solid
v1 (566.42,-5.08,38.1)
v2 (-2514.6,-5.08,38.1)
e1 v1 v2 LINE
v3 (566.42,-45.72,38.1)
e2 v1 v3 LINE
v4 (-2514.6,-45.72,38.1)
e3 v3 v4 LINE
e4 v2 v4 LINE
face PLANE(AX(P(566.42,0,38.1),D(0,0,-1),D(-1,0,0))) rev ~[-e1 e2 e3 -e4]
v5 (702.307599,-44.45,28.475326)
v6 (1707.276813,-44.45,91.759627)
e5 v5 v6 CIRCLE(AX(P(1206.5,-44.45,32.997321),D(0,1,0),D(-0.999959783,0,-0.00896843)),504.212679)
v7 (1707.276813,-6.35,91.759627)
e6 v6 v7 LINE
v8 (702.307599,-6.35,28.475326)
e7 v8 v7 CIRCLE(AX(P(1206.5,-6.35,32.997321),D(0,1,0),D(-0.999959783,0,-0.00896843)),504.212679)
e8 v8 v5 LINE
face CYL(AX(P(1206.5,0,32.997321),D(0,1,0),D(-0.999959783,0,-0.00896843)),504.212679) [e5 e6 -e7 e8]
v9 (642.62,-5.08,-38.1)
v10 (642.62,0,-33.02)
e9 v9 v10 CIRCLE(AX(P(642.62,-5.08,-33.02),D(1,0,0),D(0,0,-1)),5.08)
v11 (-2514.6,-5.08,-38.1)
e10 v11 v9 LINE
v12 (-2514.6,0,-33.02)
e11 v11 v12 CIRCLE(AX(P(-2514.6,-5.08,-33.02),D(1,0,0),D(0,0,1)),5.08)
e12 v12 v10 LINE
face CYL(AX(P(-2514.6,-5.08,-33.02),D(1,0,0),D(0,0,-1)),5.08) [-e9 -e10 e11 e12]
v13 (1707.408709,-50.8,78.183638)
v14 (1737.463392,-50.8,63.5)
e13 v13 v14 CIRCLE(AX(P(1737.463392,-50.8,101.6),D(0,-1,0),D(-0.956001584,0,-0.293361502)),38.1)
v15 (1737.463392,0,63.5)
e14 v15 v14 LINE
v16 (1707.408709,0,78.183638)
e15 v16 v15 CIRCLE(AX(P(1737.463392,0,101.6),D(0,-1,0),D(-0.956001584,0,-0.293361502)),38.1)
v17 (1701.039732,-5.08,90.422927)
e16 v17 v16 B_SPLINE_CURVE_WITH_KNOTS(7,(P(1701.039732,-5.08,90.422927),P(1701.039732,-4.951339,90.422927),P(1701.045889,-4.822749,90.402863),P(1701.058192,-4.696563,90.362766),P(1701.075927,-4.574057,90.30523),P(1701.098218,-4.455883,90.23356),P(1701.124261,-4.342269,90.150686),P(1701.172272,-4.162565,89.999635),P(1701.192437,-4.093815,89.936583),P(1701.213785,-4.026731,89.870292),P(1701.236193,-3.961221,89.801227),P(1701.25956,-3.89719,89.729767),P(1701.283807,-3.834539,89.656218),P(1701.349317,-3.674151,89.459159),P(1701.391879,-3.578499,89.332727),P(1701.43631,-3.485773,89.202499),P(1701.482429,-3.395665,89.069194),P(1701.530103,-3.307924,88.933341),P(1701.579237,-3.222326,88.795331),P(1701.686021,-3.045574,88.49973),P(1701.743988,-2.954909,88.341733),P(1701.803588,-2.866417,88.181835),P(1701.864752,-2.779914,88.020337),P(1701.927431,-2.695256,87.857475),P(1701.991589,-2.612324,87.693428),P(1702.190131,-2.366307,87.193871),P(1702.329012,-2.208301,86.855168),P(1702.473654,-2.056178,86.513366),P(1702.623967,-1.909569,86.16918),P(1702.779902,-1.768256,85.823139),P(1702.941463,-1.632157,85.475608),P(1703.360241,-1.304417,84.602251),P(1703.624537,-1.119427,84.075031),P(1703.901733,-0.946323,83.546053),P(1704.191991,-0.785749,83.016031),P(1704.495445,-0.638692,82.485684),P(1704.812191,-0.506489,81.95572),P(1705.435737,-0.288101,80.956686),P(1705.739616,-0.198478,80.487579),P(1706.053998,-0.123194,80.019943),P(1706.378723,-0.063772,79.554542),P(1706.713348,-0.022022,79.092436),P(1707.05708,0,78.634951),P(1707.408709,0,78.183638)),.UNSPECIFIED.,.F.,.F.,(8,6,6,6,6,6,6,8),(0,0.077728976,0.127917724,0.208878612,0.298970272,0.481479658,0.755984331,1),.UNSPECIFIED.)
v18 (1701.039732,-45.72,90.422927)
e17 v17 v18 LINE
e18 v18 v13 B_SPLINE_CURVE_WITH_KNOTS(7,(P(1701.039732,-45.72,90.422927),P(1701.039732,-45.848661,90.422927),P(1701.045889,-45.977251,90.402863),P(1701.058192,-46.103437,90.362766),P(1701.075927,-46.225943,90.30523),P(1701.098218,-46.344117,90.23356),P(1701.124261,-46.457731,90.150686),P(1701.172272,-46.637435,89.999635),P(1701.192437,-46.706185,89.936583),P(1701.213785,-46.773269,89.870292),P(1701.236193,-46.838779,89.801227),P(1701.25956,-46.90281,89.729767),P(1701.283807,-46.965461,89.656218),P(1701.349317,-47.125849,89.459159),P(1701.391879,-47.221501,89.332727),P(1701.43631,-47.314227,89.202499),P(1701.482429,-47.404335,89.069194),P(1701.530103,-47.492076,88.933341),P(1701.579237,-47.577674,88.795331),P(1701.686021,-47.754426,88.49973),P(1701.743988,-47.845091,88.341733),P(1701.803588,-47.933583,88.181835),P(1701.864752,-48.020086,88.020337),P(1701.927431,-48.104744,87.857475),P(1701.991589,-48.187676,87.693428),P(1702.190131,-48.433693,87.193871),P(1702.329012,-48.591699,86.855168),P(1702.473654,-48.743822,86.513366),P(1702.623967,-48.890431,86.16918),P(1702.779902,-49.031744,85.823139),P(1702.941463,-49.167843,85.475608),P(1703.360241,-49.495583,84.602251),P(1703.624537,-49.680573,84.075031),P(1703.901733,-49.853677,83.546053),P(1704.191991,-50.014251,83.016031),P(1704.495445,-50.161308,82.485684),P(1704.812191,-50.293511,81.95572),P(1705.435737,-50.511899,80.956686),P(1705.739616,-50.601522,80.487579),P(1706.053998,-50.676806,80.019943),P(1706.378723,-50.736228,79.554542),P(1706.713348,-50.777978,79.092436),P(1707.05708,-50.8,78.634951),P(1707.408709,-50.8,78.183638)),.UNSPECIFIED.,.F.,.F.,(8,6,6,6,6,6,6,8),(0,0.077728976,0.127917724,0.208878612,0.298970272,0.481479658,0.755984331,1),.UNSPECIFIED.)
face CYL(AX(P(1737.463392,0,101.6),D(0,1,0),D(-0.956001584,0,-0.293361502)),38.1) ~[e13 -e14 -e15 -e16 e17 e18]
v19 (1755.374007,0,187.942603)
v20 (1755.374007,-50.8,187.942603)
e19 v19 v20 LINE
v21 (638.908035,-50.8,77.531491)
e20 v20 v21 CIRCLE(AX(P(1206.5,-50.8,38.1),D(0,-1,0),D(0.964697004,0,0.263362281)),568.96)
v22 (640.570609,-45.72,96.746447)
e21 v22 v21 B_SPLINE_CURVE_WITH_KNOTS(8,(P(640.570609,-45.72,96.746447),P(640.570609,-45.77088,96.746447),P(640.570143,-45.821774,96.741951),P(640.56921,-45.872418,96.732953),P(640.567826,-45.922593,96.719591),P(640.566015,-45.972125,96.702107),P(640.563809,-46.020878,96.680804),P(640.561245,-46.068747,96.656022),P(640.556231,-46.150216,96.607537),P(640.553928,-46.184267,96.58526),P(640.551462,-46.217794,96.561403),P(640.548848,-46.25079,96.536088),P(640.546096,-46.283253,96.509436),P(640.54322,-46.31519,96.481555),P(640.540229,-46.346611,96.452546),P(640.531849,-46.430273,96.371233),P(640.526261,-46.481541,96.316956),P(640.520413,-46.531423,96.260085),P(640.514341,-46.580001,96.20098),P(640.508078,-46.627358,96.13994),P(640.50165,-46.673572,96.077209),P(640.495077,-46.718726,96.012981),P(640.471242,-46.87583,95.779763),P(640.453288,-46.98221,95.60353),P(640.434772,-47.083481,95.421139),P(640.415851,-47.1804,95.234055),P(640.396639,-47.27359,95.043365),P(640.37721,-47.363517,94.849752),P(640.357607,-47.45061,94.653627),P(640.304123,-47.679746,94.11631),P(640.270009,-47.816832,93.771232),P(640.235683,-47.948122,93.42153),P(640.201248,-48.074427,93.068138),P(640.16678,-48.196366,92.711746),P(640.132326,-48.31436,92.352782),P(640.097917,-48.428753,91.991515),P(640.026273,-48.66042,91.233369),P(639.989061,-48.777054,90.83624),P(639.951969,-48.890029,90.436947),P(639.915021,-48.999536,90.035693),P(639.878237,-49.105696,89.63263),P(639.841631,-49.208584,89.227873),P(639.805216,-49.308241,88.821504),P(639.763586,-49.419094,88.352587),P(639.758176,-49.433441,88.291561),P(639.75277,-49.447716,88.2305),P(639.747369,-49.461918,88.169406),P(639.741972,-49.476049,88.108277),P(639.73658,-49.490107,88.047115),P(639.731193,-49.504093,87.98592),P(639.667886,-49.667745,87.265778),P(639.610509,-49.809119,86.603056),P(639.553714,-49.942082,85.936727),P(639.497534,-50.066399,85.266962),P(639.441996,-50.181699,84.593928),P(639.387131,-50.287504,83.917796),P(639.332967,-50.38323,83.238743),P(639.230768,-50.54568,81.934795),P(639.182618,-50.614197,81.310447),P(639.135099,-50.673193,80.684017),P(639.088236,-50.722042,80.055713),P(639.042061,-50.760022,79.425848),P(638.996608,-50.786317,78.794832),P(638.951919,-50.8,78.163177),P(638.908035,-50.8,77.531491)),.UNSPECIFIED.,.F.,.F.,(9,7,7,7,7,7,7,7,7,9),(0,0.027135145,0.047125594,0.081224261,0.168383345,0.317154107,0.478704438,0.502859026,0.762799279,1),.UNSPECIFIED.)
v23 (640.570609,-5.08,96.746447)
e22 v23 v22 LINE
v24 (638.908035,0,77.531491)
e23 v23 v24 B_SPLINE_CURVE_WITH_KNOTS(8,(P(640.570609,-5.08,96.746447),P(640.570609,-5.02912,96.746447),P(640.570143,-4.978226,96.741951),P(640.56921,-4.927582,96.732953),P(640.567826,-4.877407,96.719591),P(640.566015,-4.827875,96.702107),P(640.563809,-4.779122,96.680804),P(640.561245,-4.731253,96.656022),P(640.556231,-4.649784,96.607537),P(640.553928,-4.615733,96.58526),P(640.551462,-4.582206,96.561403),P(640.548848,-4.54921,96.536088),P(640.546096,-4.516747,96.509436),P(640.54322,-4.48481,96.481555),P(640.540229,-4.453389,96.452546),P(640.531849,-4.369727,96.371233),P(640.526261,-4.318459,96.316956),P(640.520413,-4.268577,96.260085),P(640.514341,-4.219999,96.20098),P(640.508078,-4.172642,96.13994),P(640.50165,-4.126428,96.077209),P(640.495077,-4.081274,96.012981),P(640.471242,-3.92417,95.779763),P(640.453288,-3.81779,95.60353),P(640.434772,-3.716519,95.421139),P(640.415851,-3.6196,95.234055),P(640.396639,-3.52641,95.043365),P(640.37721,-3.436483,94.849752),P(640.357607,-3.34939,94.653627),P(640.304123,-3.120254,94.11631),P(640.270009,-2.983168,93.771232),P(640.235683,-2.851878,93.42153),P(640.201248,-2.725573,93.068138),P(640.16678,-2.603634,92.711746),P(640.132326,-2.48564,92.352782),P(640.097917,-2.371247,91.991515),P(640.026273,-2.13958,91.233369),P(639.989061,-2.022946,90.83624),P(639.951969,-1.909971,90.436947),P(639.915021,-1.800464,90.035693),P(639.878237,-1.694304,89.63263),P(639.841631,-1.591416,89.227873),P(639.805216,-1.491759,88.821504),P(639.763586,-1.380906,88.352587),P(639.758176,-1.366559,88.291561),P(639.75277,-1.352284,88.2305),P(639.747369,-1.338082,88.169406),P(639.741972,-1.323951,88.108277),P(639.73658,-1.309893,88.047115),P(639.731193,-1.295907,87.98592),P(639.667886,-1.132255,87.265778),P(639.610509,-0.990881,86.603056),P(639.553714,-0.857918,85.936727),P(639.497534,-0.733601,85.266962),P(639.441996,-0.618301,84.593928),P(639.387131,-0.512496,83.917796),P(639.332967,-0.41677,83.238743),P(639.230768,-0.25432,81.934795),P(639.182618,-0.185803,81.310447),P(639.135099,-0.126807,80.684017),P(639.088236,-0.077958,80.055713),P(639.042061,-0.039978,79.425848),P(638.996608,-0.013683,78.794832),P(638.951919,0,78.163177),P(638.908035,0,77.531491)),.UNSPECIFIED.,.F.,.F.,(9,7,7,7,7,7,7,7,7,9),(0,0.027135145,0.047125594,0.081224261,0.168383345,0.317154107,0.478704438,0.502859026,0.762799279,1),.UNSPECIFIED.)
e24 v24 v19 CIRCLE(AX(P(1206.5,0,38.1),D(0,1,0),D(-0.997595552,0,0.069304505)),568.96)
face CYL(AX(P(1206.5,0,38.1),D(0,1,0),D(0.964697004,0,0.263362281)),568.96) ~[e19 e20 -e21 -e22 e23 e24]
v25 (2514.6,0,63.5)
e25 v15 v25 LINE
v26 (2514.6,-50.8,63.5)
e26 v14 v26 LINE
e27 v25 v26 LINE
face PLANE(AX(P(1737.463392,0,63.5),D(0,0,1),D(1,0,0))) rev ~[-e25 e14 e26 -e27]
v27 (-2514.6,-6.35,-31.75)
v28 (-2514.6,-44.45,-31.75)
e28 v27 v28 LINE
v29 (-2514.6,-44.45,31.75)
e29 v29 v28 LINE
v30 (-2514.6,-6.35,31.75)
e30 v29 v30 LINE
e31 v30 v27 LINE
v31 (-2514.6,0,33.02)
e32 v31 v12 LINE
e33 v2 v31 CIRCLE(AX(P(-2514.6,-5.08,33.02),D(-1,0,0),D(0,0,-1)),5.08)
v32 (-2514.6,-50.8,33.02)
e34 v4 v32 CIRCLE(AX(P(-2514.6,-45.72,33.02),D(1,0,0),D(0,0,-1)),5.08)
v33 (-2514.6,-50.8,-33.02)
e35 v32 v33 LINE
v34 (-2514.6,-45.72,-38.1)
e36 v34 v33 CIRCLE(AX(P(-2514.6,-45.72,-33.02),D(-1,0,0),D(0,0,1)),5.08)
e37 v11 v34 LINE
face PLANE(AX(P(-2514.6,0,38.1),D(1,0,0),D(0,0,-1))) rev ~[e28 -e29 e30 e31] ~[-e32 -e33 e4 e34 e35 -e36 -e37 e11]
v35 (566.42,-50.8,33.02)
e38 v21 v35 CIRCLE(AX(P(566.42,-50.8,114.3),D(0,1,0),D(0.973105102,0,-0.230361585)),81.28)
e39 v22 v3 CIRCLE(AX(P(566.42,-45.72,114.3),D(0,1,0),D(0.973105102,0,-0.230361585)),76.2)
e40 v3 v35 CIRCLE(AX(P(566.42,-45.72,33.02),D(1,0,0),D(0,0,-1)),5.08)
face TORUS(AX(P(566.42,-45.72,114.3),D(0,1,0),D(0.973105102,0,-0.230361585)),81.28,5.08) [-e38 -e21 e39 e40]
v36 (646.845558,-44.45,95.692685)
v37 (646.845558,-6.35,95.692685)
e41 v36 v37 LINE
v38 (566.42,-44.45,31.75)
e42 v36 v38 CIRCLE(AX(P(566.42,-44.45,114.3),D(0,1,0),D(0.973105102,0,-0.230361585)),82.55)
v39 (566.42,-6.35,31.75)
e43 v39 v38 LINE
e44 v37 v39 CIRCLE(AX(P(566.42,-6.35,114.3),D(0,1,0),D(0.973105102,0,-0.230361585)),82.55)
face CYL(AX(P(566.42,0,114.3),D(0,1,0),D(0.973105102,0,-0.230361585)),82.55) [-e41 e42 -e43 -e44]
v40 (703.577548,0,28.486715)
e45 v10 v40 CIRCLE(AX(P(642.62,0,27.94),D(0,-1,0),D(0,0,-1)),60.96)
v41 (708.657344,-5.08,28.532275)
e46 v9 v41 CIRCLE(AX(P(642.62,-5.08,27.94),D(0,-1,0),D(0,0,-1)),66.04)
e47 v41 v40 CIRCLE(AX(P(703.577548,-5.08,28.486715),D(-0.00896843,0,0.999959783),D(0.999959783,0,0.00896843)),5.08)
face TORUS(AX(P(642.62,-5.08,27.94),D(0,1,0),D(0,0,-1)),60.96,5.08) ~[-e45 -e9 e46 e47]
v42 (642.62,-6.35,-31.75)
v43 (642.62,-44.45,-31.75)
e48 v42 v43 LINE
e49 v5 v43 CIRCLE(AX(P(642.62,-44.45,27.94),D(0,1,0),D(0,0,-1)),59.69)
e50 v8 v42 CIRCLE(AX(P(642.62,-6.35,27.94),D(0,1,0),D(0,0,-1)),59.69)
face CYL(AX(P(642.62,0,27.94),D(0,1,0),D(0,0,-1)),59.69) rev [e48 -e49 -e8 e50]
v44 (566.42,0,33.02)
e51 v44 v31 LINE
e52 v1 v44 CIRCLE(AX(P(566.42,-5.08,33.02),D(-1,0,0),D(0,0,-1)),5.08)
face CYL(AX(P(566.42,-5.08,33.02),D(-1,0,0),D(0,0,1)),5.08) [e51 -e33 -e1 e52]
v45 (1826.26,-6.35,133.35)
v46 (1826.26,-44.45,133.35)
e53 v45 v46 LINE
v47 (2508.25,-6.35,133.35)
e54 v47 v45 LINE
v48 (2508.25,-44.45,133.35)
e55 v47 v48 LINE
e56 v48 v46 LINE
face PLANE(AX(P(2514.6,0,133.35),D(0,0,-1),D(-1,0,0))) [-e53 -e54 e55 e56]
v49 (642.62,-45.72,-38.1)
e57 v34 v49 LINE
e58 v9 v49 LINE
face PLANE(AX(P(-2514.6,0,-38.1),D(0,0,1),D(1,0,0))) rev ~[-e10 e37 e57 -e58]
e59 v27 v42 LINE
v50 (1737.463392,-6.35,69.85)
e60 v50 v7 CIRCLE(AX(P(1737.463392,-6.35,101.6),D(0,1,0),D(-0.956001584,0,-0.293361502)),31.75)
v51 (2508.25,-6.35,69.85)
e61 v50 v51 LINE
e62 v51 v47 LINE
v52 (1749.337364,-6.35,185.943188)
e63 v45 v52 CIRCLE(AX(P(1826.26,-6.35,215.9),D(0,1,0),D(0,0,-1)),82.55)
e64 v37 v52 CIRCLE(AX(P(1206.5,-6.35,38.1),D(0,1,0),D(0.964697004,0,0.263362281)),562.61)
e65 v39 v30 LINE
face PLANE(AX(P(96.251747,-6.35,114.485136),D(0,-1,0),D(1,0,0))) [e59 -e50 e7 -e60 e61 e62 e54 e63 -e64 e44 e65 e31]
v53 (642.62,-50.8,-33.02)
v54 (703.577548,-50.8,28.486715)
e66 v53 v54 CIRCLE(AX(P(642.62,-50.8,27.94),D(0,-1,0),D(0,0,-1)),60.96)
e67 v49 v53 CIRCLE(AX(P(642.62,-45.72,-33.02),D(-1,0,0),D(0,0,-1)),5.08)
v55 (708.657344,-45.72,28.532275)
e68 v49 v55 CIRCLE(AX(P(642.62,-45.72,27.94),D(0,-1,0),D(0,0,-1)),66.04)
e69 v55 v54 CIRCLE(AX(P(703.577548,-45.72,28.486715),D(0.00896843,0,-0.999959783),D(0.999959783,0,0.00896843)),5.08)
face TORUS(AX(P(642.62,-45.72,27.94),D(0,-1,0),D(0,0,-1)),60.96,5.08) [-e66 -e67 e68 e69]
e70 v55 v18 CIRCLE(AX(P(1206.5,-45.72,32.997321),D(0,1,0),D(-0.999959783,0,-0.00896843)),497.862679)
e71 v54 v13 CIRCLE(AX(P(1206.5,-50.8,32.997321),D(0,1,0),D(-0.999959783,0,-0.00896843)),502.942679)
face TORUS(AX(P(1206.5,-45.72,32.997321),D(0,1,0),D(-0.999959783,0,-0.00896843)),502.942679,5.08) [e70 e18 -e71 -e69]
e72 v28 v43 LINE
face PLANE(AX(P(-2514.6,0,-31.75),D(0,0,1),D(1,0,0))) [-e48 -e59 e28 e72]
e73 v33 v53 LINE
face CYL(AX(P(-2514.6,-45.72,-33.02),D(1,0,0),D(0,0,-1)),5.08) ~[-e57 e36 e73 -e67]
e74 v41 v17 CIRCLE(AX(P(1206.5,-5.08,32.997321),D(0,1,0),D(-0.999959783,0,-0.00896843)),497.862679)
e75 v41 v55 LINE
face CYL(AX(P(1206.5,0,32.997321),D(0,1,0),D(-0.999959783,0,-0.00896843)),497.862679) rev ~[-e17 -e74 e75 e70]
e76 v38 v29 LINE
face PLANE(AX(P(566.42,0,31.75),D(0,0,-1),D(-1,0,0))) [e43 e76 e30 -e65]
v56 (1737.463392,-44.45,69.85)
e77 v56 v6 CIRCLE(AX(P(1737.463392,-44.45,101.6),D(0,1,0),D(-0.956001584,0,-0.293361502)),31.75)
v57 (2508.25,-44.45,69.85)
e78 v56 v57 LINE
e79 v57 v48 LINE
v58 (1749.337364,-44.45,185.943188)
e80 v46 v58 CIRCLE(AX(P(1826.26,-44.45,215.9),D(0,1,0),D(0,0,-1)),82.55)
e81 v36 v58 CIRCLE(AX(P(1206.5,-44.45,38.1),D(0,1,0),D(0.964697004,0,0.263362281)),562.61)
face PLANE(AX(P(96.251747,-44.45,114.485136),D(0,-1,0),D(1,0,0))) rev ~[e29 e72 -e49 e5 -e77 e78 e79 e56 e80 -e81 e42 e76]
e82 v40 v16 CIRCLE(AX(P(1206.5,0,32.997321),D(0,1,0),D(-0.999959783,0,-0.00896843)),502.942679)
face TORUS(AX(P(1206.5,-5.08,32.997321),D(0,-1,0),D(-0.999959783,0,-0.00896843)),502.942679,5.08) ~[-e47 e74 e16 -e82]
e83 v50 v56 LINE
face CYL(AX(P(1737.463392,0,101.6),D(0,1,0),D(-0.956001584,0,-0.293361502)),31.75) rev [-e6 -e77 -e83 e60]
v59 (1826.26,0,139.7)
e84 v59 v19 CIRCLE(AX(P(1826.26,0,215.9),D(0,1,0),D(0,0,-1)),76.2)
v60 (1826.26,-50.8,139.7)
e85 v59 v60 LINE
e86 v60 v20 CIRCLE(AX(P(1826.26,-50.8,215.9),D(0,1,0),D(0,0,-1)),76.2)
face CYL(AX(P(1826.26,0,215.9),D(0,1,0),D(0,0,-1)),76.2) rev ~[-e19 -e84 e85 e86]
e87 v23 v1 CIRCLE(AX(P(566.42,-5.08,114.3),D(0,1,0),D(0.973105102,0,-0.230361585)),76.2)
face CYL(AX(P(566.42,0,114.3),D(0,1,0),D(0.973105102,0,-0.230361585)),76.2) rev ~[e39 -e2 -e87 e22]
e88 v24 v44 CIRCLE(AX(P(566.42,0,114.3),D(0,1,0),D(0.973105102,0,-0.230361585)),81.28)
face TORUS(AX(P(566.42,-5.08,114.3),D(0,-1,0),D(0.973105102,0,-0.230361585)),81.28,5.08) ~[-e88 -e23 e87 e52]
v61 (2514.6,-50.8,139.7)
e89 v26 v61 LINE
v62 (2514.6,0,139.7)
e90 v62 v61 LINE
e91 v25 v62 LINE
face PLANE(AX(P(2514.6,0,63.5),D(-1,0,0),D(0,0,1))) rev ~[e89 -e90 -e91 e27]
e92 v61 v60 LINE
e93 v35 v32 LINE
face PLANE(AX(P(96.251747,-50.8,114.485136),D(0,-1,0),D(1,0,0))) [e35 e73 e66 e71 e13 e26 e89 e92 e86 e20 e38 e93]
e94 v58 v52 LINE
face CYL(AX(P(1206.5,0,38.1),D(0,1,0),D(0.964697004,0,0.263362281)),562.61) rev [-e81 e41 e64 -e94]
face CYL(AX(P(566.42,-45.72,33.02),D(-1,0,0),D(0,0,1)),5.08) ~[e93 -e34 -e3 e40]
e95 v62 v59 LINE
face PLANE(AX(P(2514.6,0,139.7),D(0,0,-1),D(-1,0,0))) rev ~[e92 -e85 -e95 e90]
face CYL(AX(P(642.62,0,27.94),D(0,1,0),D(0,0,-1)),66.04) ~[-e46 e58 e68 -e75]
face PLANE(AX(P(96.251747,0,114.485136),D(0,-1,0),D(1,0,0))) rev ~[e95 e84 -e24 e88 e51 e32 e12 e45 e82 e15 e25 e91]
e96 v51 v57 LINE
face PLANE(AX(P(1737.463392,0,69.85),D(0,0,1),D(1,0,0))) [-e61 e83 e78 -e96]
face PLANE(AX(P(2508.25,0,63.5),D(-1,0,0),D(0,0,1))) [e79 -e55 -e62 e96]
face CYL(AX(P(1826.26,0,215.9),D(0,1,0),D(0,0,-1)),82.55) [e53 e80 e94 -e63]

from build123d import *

# Parameters (mm, degrees)
F1_DEPTH = 50.8
F2_T     = -6.35
F3_R     = 5.08


# Not quite as in the source:
# - a feature names something its author has since deleted; it is built from what else it names


with BuildPart() as f1:
    # F0 (on Front) → F1 (new body)
    with BuildSketch(Plane.XZ):
        with BuildLine():
            Line((-2514.6, 38.1), (-2514.6, -38.1))
            Line((-2514.6, -38.1), (642.62, -38.1))
            ThreePointArc((642.62, -38.1), (689.5262652886, -18.5474593485), (708.6573440579, 28.5322750855))
            ThreePointArc((708.6573440579, 28.5322750855), (1175.5106386372, 529.8946007496), (1701.0397320407, 90.4229267577))
            ThreePointArc((1701.0397320407, 90.4229267577), (1714.8164995695, 70.9613276191), (1737.4633923968, 63.5))
            Line((1737.4633923968, 63.5), (2514.6, 63.5))
            Line((2514.6, 63.5), (2514.6, 139.7))
            Line((2514.6, 139.7), (1826.26, 139.7))
            ThreePointArc((1826.26, 139.7), (1783.3875941693, 152.9047873384), (1755.3740072802, 187.9426031947))
            ThreePointArc((1755.3740072802, 187.9426031947), (1160.1113564946, 605.1657592852), (640.5706087962, 96.7464472213))
            ThreePointArc((640.5706087962, 96.7464472213), (613.6897539567, 54.5337021318), (566.42, 38.1))
            Line((566.42, 38.1), (-2514.6, 38.1))
        make_face()
    extrude(amount=F1_DEPTH)

    # F2
    f2_openings = [f1.faces().sort_by_distance(p)[0] for p in [
        (-2514.6, -25.4, 0),
    ]]
    offset(amount=F2_T, openings=f2_openings, kind=Kind.INTERSECTION)

    # F3
    f3_edges = [f1.edges().sort_by_distance(p)[0] for p in [
        (-974.09, -50.8, 38.1),
        (-974.09, 0, 38.1),
        (-935.99, 0, -38.1),
        (-935.99, -50.8, -38.1),
    ]]
    fillet(f3_edges, radius=F3_R)


solid = f1.part
